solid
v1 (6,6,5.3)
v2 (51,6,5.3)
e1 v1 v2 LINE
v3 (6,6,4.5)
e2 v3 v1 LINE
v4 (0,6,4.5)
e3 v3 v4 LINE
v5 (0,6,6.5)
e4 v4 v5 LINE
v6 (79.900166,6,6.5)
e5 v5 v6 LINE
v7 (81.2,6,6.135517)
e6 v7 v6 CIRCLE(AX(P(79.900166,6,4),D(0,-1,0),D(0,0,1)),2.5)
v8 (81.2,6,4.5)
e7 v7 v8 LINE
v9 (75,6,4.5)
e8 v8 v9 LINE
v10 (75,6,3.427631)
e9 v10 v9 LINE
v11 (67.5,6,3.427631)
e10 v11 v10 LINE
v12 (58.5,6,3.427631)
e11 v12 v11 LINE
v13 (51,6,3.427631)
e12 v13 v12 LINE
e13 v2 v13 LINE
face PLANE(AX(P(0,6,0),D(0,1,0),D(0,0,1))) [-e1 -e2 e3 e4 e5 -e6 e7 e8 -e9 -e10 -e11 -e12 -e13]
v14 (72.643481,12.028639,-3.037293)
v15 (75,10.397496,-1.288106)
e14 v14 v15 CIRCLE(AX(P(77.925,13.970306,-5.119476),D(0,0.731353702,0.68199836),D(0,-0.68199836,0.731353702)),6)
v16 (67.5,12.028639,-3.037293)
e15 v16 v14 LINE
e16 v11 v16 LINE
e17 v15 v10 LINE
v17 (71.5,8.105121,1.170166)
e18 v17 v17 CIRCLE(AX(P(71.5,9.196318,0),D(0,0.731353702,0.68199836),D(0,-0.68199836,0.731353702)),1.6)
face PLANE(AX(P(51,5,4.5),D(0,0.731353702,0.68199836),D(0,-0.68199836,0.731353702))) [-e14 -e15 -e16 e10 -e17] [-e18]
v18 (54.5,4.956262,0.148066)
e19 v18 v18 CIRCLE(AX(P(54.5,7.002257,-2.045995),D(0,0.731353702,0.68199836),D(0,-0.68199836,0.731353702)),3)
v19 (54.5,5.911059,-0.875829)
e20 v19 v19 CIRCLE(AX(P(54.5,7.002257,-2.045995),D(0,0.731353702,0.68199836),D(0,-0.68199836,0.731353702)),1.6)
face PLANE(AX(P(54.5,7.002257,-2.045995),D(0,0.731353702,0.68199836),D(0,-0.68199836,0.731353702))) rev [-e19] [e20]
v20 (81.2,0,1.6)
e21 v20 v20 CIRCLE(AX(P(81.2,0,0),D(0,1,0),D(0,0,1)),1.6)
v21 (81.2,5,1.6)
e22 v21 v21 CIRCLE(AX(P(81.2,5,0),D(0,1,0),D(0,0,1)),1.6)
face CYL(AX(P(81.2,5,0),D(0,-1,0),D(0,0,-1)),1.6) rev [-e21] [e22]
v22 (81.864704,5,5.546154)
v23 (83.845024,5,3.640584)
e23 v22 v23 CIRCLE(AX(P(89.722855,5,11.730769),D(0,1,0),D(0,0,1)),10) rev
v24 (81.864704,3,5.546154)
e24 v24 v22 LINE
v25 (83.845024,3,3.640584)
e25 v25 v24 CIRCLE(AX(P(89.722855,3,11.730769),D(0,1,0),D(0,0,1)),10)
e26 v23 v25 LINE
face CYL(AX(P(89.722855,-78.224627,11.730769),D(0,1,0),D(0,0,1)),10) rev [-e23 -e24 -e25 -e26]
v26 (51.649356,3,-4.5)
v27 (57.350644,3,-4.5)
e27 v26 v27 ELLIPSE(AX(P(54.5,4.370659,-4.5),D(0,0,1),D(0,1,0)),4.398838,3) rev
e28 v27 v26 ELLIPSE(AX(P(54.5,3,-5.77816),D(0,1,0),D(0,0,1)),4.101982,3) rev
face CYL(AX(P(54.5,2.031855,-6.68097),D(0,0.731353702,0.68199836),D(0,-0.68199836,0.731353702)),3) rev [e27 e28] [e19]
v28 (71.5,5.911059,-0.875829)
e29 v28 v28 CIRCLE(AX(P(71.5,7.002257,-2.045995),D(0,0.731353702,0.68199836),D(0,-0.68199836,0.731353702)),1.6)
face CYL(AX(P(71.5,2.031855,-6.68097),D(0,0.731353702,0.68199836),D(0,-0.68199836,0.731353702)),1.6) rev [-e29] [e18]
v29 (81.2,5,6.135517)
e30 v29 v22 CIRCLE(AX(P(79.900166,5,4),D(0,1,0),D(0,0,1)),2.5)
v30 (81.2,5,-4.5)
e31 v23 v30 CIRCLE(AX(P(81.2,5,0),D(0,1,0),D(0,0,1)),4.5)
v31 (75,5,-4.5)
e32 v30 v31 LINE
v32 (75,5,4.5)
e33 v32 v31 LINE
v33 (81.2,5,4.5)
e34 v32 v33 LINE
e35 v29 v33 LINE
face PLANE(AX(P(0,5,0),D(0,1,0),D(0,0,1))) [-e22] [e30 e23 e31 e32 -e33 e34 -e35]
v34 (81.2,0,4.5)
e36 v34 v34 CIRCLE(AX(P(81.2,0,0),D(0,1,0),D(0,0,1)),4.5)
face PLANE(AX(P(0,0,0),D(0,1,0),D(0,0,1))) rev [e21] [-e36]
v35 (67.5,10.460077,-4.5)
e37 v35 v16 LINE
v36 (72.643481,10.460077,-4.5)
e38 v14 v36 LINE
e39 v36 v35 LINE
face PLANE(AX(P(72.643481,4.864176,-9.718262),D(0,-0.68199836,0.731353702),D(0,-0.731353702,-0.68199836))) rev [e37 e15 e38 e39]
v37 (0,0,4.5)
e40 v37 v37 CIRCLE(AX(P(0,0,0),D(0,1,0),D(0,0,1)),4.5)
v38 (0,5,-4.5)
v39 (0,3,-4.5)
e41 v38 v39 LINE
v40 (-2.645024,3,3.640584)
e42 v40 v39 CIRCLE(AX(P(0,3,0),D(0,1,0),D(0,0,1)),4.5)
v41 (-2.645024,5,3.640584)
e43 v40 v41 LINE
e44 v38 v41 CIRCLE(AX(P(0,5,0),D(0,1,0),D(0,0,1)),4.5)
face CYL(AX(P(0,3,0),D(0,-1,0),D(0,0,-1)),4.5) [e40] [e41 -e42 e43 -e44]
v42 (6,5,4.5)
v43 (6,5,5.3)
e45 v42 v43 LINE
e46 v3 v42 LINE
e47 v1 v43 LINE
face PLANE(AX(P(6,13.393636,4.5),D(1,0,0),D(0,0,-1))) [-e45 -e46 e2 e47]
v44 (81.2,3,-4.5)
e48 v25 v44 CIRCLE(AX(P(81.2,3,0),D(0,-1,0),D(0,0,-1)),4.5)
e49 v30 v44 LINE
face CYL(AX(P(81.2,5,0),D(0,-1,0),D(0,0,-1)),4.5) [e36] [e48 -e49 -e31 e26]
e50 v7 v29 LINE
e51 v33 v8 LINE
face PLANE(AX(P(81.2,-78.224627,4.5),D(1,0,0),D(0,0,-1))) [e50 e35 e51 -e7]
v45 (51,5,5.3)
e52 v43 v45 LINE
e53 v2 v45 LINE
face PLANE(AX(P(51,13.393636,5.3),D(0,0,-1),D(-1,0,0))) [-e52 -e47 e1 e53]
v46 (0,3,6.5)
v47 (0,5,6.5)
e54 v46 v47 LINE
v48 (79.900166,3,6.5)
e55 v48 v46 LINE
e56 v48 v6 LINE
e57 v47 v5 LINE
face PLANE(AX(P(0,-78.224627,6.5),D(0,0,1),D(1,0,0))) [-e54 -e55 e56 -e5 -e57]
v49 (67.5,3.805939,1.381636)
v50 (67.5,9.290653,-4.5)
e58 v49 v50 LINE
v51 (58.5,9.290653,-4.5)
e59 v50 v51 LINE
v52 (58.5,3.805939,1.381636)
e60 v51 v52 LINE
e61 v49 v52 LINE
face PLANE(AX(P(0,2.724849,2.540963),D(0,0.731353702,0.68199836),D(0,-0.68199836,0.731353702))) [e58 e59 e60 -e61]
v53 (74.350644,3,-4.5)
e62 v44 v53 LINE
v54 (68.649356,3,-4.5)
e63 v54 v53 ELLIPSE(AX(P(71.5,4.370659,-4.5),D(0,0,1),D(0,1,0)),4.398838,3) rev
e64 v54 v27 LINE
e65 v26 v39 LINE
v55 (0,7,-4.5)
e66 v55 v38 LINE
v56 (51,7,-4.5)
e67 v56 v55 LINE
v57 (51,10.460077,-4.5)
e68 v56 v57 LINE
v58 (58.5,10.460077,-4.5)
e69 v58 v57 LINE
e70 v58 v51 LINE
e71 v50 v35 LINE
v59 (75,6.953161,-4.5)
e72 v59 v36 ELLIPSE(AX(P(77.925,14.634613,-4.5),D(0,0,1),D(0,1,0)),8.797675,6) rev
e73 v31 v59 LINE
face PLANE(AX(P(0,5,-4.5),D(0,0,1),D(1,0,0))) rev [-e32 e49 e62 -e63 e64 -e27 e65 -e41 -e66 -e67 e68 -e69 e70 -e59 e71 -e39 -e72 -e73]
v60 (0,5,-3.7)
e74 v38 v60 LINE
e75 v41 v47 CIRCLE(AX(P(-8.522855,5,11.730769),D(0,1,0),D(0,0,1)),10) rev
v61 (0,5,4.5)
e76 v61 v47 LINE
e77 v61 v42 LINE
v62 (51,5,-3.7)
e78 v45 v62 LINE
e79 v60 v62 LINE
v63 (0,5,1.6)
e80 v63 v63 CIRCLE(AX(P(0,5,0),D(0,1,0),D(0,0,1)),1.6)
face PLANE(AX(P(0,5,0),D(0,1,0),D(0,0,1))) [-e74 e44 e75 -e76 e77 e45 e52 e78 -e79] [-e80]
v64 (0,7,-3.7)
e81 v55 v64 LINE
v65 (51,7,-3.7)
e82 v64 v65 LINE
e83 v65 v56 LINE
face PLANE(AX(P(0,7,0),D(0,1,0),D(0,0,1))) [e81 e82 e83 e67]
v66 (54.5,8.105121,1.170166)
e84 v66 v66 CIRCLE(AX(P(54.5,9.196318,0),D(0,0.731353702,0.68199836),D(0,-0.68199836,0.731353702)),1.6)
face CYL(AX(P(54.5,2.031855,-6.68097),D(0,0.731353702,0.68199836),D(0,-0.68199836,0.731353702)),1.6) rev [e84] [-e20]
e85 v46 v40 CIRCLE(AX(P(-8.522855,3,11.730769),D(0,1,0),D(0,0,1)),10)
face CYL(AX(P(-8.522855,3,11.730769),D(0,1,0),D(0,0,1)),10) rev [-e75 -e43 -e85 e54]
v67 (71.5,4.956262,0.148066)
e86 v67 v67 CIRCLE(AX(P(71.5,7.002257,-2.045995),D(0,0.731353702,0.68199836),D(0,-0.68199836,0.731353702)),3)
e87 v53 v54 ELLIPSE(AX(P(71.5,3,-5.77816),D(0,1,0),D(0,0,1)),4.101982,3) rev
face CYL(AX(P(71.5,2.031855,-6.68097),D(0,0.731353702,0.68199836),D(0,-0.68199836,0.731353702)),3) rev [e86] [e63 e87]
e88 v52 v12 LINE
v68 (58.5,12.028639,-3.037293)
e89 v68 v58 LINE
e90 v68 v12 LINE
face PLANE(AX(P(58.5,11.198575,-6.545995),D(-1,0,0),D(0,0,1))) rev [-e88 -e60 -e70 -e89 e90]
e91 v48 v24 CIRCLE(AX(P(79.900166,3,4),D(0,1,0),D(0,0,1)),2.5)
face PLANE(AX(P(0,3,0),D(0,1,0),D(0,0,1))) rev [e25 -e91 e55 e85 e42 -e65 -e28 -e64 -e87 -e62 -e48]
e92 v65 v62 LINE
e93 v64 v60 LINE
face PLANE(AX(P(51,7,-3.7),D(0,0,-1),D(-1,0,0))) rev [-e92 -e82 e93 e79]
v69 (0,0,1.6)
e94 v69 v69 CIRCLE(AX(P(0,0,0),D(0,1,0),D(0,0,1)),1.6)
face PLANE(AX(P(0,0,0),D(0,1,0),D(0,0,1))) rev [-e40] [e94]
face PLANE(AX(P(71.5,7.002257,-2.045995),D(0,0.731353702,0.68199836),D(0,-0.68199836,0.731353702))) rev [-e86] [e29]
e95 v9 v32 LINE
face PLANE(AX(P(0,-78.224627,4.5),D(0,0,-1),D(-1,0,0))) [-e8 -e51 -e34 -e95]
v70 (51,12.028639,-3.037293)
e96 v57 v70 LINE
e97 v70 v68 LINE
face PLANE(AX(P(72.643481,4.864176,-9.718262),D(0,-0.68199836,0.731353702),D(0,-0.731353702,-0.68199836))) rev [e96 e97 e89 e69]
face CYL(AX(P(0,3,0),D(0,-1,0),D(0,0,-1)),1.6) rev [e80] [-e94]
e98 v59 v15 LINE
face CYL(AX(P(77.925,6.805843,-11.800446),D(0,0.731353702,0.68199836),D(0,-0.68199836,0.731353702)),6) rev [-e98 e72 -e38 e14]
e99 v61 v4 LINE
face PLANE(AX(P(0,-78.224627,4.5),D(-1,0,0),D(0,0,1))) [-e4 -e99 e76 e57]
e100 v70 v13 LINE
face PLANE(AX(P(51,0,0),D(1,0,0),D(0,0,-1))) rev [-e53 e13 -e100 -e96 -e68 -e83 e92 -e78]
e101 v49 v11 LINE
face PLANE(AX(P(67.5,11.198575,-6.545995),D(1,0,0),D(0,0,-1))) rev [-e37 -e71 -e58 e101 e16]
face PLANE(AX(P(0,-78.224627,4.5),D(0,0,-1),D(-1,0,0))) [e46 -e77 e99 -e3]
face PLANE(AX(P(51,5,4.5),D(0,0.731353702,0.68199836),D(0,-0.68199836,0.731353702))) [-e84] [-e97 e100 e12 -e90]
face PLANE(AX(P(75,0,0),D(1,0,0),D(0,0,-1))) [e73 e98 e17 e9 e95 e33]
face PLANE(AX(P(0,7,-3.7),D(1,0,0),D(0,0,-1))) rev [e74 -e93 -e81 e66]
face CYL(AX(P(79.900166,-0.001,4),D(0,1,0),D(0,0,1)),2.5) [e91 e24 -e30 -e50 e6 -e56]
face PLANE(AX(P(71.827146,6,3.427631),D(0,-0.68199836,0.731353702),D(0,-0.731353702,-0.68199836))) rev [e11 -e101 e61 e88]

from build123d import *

# Parameters (mm, degrees)
SKETCH_1_R                  = 4.5
SKETCH_1_R_2                = 1.6
EXTRUDE_1_DEPTH             = 3
SKETCH_2_R                  = 1.6
EXTRUDE_2_DEPTH             = 2
EXTRUDE_3_DEPTH             = 24
CUT_EXTRUDE_1_REACH         = 88.596
SKETCH_4_R                  = 1.6
SKETCH_6_W                  = 9
SKETCH_6_H                  = 13.66994387
CUT_EXTRUDE_2_DEPTH         = 3
CUT_EXTRUDE_3_REACH         = 88.648
SKETCH_7_R                  = 3
EXTRUDE_START               = 3
SKETCH_8_R                  = 4.5
SKETCH_8_R_2                = 1.6
EXTRUDE_4_DEPTH             = 3
CUT_EXTRUDE_4_REACH         = 88.596
SKETCH_9_R                  = 6
SKETCH_10_W                 = 51
SKETCH_10_H                 = 0.8
EXTRUDE_5_DEPTH             = 2
SKETCH_11_W                 = 81.2
SKETCH_11_H                 = 2
EXTRUDE_6_DEPTH             = 1
EXTRUDE_6_DIRECTION_2_REACH = 88.227
FILLET_1_R                  = 10
CUT_EXTRUDE_5_REACH         = 88.355
SKETCH_12_W                 = 45
SKETCH_12_H                 = 0.8
EXTRUDE_7_DEPTH             = 24
EXTRUDE_8_DEPTH             = 9
CUT_EXTRUDE_START           = -2.144737
SKETCH_15_W                 = 21.643481228
SKETCH_15_H                 = 2
CUT_EXTRUDE_6_DEPTH         = 2.144737
CUT_EXTRUDE_7_REACH         = 88.157


with BuildPart() as part:
    # 草图1 → 凸台-拉伸1 (new body)
    with BuildSketch(Plane(origin=(0, 0, 0), x_dir=(1, 0, 0), z_dir=(0, 1, 0))):
        with Locations(Location((0, 0, 0), (0, 0, 270))):
            Circle(SKETCH_1_R)
        with Locations(Location((0, 0, 0), (0, 0, 270))):
            Circle(SKETCH_1_R_2, mode=Mode.SUBTRACT)
    extrude(amount=EXTRUDE_1_DEPTH)

    # 草图2 → 凸台-拉伸2 (add)
    with BuildSketch(Plane(origin=(0, 3, 0), x_dir=(1, 0, 0), z_dir=(0, 1, 0))):
        with BuildLine():
            Line((0, 4.5), (81.2, 4.5))
            ThreePointArc((81.2, 4.5), (85.7, 0), (81.2, -4.5))
            Line((81.2, -4.5), (0, -4.5))
            ThreePointArc((0, -4.5), (-4.5, 0), (0, 4.5))
        make_face()
        with Locations(Location((81.2, 0, 0), (0, 0, 270))):
            Circle(SKETCH_2_R, mode=Mode.SUBTRACT)
        with Locations(Location((0, 0, 0), (0, 0, 270))):
            Circle(SKETCH_2_R, mode=Mode.SUBTRACT)
    extrude(amount=EXTRUDE_2_DEPTH)

    # 草图3 → 凸台-拉伸3 (add)
    with BuildSketch(Plane(origin=(75, 0, 0), x_dir=(0, 0, -1), z_dir=(1, 0, 0))):
        Polygon((-4.5, 5), (4.5, 13.392635775), (4.5, 5), align=None)
    extrude(amount=-EXTRUDE_3_DEPTH)

    # 草图4 → 切除-拉伸1 (cut, up to next)
    with BuildSketch(Plane(origin=(0, 4.918910297, 4.58695806), x_dir=(1, 0, 0), z_dir=(0, 0.7313537016191739, 0.6819983600624948)), mode=Mode.PRIVATE) as cut_extrude_1_sk1:
        with Locations(Location((54.5, 6.271873718, 0), (0, 0, 270))):
            Circle(SKETCH_4_R)
    cut_extrude_1_tool1 = extrude(cut_extrude_1_sk1.sketch, amount=-CUT_EXTRUDE_1_REACH, mode=Mode.PRIVATE) & part.part
    # 草图4 → 切除-拉伸1 (cut, up to next)
    with BuildSketch(Plane(origin=(0, 4.918910297, 4.58695806), x_dir=(1, 0, 0), z_dir=(0, 0.7313537016191739, 0.6819983600624948)), mode=Mode.PRIVATE) as cut_extrude_1_sk2:
        with Locations(Location((71.5, 6.271873718, 0), (0, 0, 270))):
            Circle(SKETCH_4_R)
    cut_extrude_1_tool2 = extrude(cut_extrude_1_sk2.sketch, amount=-CUT_EXTRUDE_1_REACH, mode=Mode.PRIVATE) & part.part
    add(cut_extrude_1_tool1.solids().sort_by_distance((54.5, 9.196318, 0))[0], mode=Mode.SUBTRACT)
    add(cut_extrude_1_tool2.solids().sort_by_distance((71.5, 9.196318, 0))[0], mode=Mode.SUBTRACT)

    # 草图6 → 切除-拉伸2 (cut)
    with BuildSketch(Plane(origin=(0, 4.918910297, 4.58695806), x_dir=(1, 0, 0), z_dir=(0, 0.7313537016191739, 0.6819983600624948))):
        with Locations((63, 5.589875358)):
            Rectangle(SKETCH_6_W, SKETCH_6_H)
    extrude(amount=-CUT_EXTRUDE_2_DEPTH, mode=Mode.SUBTRACT)

    # 草图7 → 切除-拉伸3 (cut, up to next)
    with BuildSketch(Plane(origin=(0, 2.724849193, 2.54096298), x_dir=(1, 0, 0), z_dir=(0, 0.7313537016191739, 0.6819983600624948)), mode=Mode.PRIVATE) as cut_extrude_3_sk1:
        with Locations(Location((54.5, 6.271873718, 0), (0, 0, 270))):
            Circle(SKETCH_7_R)
    cut_extrude_3_tool1 = extrude(cut_extrude_3_sk1.sketch, amount=-CUT_EXTRUDE_3_REACH, mode=Mode.PRIVATE) & part.part
    # 草图7 → 切除-拉伸3 (cut, up to next)
    with BuildSketch(Plane(origin=(0, 2.724849193, 2.54096298), x_dir=(1, 0, 0), z_dir=(0, 0.7313537016191739, 0.6819983600624948)), mode=Mode.PRIVATE) as cut_extrude_3_sk2:
        with Locations(Location((71.5, 6.271873718, 0), (0, 0, 270))):
            Circle(SKETCH_7_R)
    cut_extrude_3_tool2 = extrude(cut_extrude_3_sk2.sketch, amount=-CUT_EXTRUDE_3_REACH, mode=Mode.PRIVATE) & part.part
    add(cut_extrude_3_tool1.solids().sort_by_distance((54.5, 7.002257, -2.045995))[0], mode=Mode.SUBTRACT)
    add(cut_extrude_3_tool2.solids().sort_by_distance((71.5, 7.002257, -2.045995))[0], mode=Mode.SUBTRACT)

    # 草图8 → 凸台-拉伸4 (add)
    with BuildSketch(Plane.XZ.offset(-3).offset(EXTRUDE_START)):
        with Locations(Location((81.2, 0, 0), (0, 0, 90))):
            Circle(SKETCH_8_R)
        with Locations(Location((81.2, 0, 0), (0, 0, 90))):
            Circle(SKETCH_8_R_2, mode=Mode.SUBTRACT)
    extrude(amount=-EXTRUDE_4_DEPTH)

    # 草图9 → 切除-拉伸4 (cut, up to next)
    with BuildSketch(Plane(origin=(0, 4.918910297, 4.58695806), x_dir=(1, 0, 0), z_dir=(0, 0.7313537016191739, 0.6819983600624948)), mode=Mode.PRIVATE) as cut_extrude_4_sk1:
        with Locations((77.925, 13.271873718)):
            Circle(SKETCH_9_R)
    cut_extrude_4_tool1 = extrude(cut_extrude_4_sk1.sketch, amount=-CUT_EXTRUDE_4_REACH, mode=Mode.PRIVATE) & part.part
    add(cut_extrude_4_tool1.solids().sort_by_distance((77.925, 13.970306, -5.119476))[0], mode=Mode.SUBTRACT)

    # 草图10 → 凸台-拉伸5 (add)
    with BuildSketch(Plane(origin=(0, 5, 0), x_dir=(1, 0, 0), z_dir=(0, 1, 0))):
        with Locations((25.5, 4.1)):
            Rectangle(SKETCH_10_W, SKETCH_10_H)
    extrude(amount=EXTRUDE_5_DEPTH)

    # 草图11 → 凸台-拉伸6 (add)
    with BuildSketch(Plane(origin=(0, 5, 0), x_dir=(1, 0, 0), z_dir=(0, 1, 0))):
        with Locations((40.6, -5.5)):
            Rectangle(SKETCH_11_W, SKETCH_11_H)
    extrude(amount=EXTRUDE_6_DEPTH)

    # 凸台-拉伸6 direction 2: up to this face of the body (flat: up to its plane)
    extrude_6_direction_2_end = Plane(part.part.faces().sort_by_distance((39.023781637, 3, 0.016114568))[0])
    # 草图11 → 凸台-拉伸6 direction 2 (add, up to the picked face)
    with BuildSketch(Plane(origin=(0, 5, 0), x_dir=(1, 0, 0), z_dir=(0, 1, 0)), mode=Mode.PRIVATE) as extrude_6_direction_2_sk1:
        with Locations((40.6, -5.5)):
            Rectangle(SKETCH_11_W, SKETCH_11_H)
    extrude_6_direction_2_tool1 = split(extrude(extrude_6_direction_2_sk1.sketch, amount=-EXTRUDE_6_DIRECTION_2_REACH, mode=Mode.PRIVATE), bisect_by=extrude_6_direction_2_end, keep=Keep.BOTH, mode=Mode.PRIVATE)
    add(extrude_6_direction_2_tool1.solids().sort_by(Axis((40.6, 5, 5.5), (0, -1, 0)))[0])

    # 圆角1
    # the kernel refuses this fillet: 10 mm, written as the material it adds along each edge
    with BuildSketch(Plane(origin=(81.2, 3, 4.5), x_dir=(0.9510569298520609, 0, -0.30901572157476376), z_dir=(0, 1, 0))) as fillet_1_piece_1:
        with BuildLine():
            CenterArc((5.87129871, -9.510569299), FILLET_1_R, 107.999923321, 22.461280704)
            Line((-0.618031443, -1.90211386), (0, 0))
            ThreePointArc((0, 0), (1.390570747, -0.220243816), (2.781141494, 0))
        make_face()
    extrude(amount=2)
    with BuildSketch(Plane(origin=(0, 3, 4.5), x_dir=(-0.9510569298520611, 0, -0.3090157215747629), z_dir=(0, 1, 0))) as fillet_1_piece_2:
        with BuildLine():
            CenterArc((5.87129871, 9.510569299), FILLET_1_R, 229.538795975, 22.461280704)
            Line((-0.618031443, 1.90211386), (0, 0))
            ThreePointArc((0, 0), (1.390570747, 0.220243816), (2.781141494, 0))
        make_face()
    extrude(amount=2)

    # 草图12 → 切除-拉伸5 (cut, up to next)
    with BuildSketch(Plane(origin=(0, 5, 0), x_dir=(1, 0, 0), z_dir=(0, 1, 0)), mode=Mode.PRIVATE) as cut_extrude_5_sk1:
        with Locations((28.5, -4.9)):
            Rectangle(SKETCH_12_W, SKETCH_12_H)
    cut_extrude_5_tool1 = extrude(cut_extrude_5_sk1.sketch, amount=CUT_EXTRUDE_5_REACH, mode=Mode.PRIVATE) & part.part
    add(cut_extrude_5_tool1.solids().sort_by_distance((28.5, 5, 4.9))[0], mode=Mode.SUBTRACT)

    # 草图13 → 凸台-拉伸7 (add)
    with BuildSketch(Plane(origin=(75, 0, 0), x_dir=(0, 0, -1), z_dir=(1, 0, 0))):
        Polygon((-4.5, 6), (-3.42763129, 6), (-4.5, 5), align=None)
    extrude(amount=-EXTRUDE_7_DEPTH)

    # 草图14 → 凸台-拉伸8 (add)
    with BuildSketch(Plane(origin=(58.5, 0, 0), x_dir=(0, 0, -1), z_dir=(1, 0, 0))):
        Polygon((-3.42763129, 6), (-1.38163621, 3.805938895), (-2.245899863, 3), (-4.5, 3), (-4.5, 5), align=None)
    extrude(amount=EXTRUDE_8_DEPTH)

    # 草图15 → 切除-拉伸6 (cut)
    with BuildSketch(Plane(origin=(0, 4.918910297, 4.58695806), x_dir=(1, 0, 0), z_dir=(0, 0.7313537016191739, 0.6819983600624948)).offset(CUT_EXTRUDE_START)):
        with Locations((61.821740614, 11.424847293)):
            Rectangle(SKETCH_15_W, SKETCH_15_H)
    extrude(amount=CUT_EXTRUDE_6_DEPTH, mode=Mode.SUBTRACT)

    # 草图16 → 切除-拉伸7 (cut, up to next)
    with BuildSketch(Plane(origin=(0, 6, 0), x_dir=(1, 0, 0), z_dir=(0, 1, 0)), mode=Mode.PRIVATE) as cut_extrude_7_sk1:
        with BuildLine():
            Line((79.900166375, -6.5), (81.2, -6.5))
            ThreePointArc((81.2, -6.5), (81.518478449, -6.013408883), (81.864704052, -5.546153846))
            ThreePointArc((81.864704052, -5.546153846), (80.992094803, -6.24893137), (79.900166375, -6.5))
        make_face()
    cut_extrude_7_tool1 = extrude(cut_extrude_7_sk1.sketch, amount=-CUT_EXTRUDE_7_REACH, mode=Mode.PRIVATE) & part.part
    add(cut_extrude_7_tool1.solids().sort_by_distance((81.054691, 6, 6.297183))[0], mode=Mode.SUBTRACT)


solid = part.part
